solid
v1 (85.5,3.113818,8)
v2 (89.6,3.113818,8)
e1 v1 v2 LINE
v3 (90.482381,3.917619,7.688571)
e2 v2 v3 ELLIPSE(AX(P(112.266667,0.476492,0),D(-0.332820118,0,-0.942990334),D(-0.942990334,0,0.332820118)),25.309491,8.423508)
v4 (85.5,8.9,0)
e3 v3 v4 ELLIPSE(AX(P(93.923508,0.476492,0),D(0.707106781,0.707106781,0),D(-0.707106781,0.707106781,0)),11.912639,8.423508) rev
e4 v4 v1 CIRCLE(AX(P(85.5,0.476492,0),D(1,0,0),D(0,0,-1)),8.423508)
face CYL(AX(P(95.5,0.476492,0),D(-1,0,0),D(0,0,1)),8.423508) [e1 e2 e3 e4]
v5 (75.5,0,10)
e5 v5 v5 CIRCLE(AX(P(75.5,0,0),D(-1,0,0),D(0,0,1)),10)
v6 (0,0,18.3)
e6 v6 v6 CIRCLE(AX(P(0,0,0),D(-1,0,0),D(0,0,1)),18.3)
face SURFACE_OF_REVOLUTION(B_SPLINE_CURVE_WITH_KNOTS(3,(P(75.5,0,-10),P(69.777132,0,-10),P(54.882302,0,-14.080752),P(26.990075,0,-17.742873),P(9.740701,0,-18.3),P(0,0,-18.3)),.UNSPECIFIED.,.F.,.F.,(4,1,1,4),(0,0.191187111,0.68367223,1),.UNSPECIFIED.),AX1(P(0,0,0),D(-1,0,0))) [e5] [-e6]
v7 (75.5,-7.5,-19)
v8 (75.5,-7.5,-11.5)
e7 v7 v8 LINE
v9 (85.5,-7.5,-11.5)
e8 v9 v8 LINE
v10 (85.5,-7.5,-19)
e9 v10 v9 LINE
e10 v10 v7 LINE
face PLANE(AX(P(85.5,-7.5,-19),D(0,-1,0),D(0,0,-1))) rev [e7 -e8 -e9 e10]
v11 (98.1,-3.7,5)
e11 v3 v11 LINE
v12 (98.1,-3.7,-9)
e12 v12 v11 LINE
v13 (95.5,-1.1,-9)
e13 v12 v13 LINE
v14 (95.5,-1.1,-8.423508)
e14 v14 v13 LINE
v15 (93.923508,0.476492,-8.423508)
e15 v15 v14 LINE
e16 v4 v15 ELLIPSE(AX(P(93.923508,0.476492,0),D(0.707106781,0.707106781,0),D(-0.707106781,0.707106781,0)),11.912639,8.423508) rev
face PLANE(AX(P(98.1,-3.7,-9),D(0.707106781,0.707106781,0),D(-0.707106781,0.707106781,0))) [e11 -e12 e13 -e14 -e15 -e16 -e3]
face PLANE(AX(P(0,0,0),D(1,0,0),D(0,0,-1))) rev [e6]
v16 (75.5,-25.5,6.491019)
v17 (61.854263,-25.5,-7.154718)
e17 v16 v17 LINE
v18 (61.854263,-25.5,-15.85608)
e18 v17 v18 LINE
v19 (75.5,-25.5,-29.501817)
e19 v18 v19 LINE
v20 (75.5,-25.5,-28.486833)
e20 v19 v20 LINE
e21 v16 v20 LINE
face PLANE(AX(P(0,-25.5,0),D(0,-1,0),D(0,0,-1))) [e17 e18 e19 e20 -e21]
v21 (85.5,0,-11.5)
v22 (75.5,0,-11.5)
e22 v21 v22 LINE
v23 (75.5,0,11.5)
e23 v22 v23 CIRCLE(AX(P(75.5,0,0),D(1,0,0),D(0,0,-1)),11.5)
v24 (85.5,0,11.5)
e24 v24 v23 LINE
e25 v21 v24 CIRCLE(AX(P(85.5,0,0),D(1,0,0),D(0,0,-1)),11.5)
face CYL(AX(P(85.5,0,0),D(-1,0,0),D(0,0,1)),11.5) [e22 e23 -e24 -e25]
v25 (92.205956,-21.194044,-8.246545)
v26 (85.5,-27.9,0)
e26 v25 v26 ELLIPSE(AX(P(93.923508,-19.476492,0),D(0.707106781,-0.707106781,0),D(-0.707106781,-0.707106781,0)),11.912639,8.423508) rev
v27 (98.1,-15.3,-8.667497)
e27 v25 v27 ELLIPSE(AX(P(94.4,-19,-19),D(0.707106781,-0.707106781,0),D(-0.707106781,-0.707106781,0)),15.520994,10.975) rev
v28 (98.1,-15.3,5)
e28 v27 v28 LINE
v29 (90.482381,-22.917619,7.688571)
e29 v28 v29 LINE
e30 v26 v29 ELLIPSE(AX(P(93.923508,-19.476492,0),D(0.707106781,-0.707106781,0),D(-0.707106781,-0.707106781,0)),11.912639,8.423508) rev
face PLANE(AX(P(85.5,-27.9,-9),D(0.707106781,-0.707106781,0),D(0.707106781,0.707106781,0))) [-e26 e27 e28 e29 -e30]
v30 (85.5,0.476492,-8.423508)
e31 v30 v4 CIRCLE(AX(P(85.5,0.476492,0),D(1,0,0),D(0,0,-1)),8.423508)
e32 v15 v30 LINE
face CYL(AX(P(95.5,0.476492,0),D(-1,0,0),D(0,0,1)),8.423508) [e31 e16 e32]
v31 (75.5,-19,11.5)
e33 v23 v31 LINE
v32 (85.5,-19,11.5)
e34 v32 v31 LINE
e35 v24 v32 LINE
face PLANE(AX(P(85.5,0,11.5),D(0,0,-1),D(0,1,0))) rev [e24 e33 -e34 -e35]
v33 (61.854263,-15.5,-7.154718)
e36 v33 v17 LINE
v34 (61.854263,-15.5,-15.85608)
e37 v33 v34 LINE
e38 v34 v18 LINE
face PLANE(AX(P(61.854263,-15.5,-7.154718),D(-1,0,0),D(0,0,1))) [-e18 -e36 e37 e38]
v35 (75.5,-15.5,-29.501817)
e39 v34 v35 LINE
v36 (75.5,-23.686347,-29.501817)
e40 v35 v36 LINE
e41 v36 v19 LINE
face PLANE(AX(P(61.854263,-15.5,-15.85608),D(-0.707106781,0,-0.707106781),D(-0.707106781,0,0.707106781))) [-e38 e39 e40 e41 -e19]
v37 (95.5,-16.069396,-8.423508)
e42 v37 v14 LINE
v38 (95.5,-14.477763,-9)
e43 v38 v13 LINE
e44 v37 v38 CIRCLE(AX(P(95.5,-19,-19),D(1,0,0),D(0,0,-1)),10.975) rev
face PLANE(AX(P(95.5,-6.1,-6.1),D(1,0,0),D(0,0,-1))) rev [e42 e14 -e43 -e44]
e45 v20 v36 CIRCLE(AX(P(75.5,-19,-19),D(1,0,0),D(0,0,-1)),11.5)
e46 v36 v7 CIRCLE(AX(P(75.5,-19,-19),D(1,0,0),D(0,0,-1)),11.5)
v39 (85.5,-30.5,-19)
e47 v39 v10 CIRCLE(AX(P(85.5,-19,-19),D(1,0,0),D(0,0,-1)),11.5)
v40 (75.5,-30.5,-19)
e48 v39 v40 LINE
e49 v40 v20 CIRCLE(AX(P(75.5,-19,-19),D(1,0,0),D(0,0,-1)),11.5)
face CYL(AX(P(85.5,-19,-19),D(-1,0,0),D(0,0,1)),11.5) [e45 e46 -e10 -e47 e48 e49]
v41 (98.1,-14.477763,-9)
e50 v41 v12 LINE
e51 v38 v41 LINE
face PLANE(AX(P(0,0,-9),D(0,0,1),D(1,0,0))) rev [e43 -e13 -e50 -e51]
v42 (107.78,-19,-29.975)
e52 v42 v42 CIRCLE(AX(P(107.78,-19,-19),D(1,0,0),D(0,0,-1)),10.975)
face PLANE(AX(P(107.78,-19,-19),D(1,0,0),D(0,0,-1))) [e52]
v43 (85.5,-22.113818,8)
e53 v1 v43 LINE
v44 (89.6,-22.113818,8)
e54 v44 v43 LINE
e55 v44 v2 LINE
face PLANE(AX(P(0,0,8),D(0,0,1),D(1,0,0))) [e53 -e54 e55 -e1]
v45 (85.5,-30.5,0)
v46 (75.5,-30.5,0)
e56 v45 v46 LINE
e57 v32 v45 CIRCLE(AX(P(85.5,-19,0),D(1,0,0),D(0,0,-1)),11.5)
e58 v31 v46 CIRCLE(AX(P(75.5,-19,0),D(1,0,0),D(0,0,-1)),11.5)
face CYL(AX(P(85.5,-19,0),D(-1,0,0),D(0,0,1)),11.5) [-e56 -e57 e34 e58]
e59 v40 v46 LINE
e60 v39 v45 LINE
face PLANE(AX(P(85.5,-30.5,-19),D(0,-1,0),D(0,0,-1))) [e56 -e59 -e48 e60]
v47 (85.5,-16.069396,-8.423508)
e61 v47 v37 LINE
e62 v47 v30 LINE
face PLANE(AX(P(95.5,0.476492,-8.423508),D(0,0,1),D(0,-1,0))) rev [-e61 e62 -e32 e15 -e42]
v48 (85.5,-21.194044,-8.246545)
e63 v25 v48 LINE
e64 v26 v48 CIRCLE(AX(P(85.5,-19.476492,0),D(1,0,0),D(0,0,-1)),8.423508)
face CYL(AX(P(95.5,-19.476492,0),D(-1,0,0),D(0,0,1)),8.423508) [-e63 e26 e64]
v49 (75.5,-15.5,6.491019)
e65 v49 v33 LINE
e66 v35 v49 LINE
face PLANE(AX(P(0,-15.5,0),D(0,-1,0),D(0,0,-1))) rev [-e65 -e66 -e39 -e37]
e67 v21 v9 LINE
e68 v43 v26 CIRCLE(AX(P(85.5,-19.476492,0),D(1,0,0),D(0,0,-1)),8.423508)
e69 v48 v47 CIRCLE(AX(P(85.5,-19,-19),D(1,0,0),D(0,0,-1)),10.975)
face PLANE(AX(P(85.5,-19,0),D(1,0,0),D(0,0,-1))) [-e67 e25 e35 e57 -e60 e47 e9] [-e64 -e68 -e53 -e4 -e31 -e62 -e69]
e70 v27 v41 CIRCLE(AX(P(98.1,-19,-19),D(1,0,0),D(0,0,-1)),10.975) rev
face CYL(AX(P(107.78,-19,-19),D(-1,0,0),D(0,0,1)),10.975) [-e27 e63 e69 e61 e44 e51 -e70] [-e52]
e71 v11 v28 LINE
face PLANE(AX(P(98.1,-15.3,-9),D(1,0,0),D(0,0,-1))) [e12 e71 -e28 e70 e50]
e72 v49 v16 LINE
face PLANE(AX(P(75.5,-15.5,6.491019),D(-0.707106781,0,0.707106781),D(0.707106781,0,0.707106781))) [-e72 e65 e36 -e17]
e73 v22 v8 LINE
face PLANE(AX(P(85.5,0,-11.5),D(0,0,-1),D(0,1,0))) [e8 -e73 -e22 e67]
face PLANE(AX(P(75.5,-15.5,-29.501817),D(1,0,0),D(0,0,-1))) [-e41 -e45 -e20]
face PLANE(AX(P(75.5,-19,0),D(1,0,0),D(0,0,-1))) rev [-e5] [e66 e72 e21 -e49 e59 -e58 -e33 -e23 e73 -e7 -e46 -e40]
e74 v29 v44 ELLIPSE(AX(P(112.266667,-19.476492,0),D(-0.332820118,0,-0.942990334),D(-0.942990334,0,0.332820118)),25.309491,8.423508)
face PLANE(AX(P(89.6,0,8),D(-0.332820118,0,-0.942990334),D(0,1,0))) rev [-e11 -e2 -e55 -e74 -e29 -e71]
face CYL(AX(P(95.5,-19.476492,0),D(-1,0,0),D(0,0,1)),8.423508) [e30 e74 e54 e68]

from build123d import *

# Parameters (mm, degrees)
BOSS_EXTRUDE1_DEPTH = 10
BOSS_EXTRUDE2_START = -3.5
BOSS_EXTRUDE2_DEPTH = 17
BOSS_EXTRUDE3_START = -5
BOSS_EXTRUDE3_DEPTH = 10
SKETCH6_OUTSIDE_W   = 74.788
SKETCH6_OUTSIDE_H   = 74.788
CUT_EXTRUDE1_DEPTH  = 10
SKETCH5_R           = 10.975
BOSS_EXTRUDE4_DEPTH = 22.28
CHAMFER2_SIZE       = 8.5
CHAMFER2_SIZE_2     = 3


with BuildPart() as part:
    # Sketch1 → Revolve1 (revolve)
    with BuildSketch(Plane(origin=(0, 0, 0), x_dir=(1, 0, 0), z_dir=(0, 1, 0))):
        with BuildLine():
            Line((75.5, 0), (75.5, 10))
            add(Edge.make_bspline(
                [(0, 18.3), (9.740701491, 18.3), (26.990075189, 17.742872667), (54.88230213, 14.080751962), (69.777131961, 10), (75.5, 10)],
                knots=[0, 0, 0, 0, 0.31632777, 0.808812889, 1, 1, 1, 1], degree=3))
            Line((0, 18.3), (0, 0))
            Line((0, 0), (75.5, 0))
        make_face()
    revolve(axis=Axis((0, 0, 0), (1, 0, 0)))

    # Sketch2 → Boss-Extrude1 (add)
    with BuildSketch(Plane(origin=(75.5, 0, 0), x_dir=(0, 0, -1), z_dir=(1, 0, 0))):
        with BuildLine():
            Line((-11.5, 0), (-11.5, -19))
            ThreePointArc((-11.5, -19), (-8.131727984, -27.131727984), (0, -30.5))
            Line((0, -30.5), (19, -30.5))
            ThreePointArc((19, -30.5), (30.5, -19), (19, -7.5))
            Line((19, -7.5), (11.5, -7.5))
            Line((11.5, -7.5), (11.5, 0))
            ThreePointArc((11.5, 0), (0, 11.5), (-11.5, 0))
        make_face()
    extrude(amount=BOSS_EXTRUDE1_DEPTH)

    # Sketch3 → Boss-Extrude2 (add)
    with BuildSketch(Plane.XY.offset(11.5).offset(BOSS_EXTRUDE2_START)):
        Polygon((85.5, -27.9), (98.1, -15.3), (98.1, -3.7), (85.5, 8.9), align=None)
    extrude(amount=-BOSS_EXTRUDE2_DEPTH)

    # Sketch4 → Boss-Extrude3 (add)
    with BuildSketch(Plane(origin=(0, -30.5, 0), x_dir=(-1, 0, 0), z_dir=(0, -1, 0)).offset(BOSS_EXTRUDE3_START)):
        Polygon((-75.5, -6.49101914), (-61.854263107, 7.154717753), (-61.854263107, 15.856079818), (-75.5, 29.50181671), align=None)
    extrude(amount=-BOSS_EXTRUDE3_DEPTH)

    # Sketch6 outside → Cut-Extrude1 (cut)
    with BuildSketch(Plane(origin=(85.5, 0, 0), x_dir=(0, 0, -1), z_dir=(1, 0, 0))):
        with Locations((6.1, -6.1)):
            Rectangle(SKETCH6_OUTSIDE_W, SKETCH6_OUTSIDE_H)
        with BuildLine():
            Line((8.423507913, 0.476492087), (8.423507913, -19.476492087))
            ThreePointArc((8.423507913, -19.476492087), (0, -27.9), (-8.423507913, -19.476492087))
            Line((-8.423507913, -19.476492087), (-8.423507913, 0.476492087))
            ThreePointArc((-8.423507913, 0.476492087), (0, 8.9), (8.423507913, 0.476492087))
        make_face(mode=Mode.SUBTRACT)
    extrude(amount=CUT_EXTRUDE1_DEPTH, mode=Mode.SUBTRACT)

    # Sketch5 → Boss-Extrude4 (add)
    with BuildSketch(Plane(origin=(85.5, 0, 0), x_dir=(0, 0, -1), z_dir=(1, 0, 0))):
        with Locations(Location((19, -19, 0), (0, 0, 191.531863493))):
            Circle(SKETCH5_R)
    extrude(amount=BOSS_EXTRUDE4_DEPTH)

    # Chamfer2
    # the kernel refuses this chamfer: 8.5, 3 mm, written as the material it takes off along each edge
    with BuildSketch(Plane(origin=(98.1, -37.353356339, 8), x_dir=(-0.9999177197745295, 0, 0.012827847867252683), z_dir=(0, 1, 0))) as chamfer2_piece_1:
        Polygon((CHAMFER2_SIZE * 0.999917719775, -CHAMFER2_SIZE * 0.0128278478673), (-CHAMFER2_SIZE_2 * 0.0128278478673, -CHAMFER2_SIZE_2 * 0.999917719775), (0, 0), align=None)
    extrude(amount=55.706712677, mode=Mode.SUBTRACT)


solid = part.part
